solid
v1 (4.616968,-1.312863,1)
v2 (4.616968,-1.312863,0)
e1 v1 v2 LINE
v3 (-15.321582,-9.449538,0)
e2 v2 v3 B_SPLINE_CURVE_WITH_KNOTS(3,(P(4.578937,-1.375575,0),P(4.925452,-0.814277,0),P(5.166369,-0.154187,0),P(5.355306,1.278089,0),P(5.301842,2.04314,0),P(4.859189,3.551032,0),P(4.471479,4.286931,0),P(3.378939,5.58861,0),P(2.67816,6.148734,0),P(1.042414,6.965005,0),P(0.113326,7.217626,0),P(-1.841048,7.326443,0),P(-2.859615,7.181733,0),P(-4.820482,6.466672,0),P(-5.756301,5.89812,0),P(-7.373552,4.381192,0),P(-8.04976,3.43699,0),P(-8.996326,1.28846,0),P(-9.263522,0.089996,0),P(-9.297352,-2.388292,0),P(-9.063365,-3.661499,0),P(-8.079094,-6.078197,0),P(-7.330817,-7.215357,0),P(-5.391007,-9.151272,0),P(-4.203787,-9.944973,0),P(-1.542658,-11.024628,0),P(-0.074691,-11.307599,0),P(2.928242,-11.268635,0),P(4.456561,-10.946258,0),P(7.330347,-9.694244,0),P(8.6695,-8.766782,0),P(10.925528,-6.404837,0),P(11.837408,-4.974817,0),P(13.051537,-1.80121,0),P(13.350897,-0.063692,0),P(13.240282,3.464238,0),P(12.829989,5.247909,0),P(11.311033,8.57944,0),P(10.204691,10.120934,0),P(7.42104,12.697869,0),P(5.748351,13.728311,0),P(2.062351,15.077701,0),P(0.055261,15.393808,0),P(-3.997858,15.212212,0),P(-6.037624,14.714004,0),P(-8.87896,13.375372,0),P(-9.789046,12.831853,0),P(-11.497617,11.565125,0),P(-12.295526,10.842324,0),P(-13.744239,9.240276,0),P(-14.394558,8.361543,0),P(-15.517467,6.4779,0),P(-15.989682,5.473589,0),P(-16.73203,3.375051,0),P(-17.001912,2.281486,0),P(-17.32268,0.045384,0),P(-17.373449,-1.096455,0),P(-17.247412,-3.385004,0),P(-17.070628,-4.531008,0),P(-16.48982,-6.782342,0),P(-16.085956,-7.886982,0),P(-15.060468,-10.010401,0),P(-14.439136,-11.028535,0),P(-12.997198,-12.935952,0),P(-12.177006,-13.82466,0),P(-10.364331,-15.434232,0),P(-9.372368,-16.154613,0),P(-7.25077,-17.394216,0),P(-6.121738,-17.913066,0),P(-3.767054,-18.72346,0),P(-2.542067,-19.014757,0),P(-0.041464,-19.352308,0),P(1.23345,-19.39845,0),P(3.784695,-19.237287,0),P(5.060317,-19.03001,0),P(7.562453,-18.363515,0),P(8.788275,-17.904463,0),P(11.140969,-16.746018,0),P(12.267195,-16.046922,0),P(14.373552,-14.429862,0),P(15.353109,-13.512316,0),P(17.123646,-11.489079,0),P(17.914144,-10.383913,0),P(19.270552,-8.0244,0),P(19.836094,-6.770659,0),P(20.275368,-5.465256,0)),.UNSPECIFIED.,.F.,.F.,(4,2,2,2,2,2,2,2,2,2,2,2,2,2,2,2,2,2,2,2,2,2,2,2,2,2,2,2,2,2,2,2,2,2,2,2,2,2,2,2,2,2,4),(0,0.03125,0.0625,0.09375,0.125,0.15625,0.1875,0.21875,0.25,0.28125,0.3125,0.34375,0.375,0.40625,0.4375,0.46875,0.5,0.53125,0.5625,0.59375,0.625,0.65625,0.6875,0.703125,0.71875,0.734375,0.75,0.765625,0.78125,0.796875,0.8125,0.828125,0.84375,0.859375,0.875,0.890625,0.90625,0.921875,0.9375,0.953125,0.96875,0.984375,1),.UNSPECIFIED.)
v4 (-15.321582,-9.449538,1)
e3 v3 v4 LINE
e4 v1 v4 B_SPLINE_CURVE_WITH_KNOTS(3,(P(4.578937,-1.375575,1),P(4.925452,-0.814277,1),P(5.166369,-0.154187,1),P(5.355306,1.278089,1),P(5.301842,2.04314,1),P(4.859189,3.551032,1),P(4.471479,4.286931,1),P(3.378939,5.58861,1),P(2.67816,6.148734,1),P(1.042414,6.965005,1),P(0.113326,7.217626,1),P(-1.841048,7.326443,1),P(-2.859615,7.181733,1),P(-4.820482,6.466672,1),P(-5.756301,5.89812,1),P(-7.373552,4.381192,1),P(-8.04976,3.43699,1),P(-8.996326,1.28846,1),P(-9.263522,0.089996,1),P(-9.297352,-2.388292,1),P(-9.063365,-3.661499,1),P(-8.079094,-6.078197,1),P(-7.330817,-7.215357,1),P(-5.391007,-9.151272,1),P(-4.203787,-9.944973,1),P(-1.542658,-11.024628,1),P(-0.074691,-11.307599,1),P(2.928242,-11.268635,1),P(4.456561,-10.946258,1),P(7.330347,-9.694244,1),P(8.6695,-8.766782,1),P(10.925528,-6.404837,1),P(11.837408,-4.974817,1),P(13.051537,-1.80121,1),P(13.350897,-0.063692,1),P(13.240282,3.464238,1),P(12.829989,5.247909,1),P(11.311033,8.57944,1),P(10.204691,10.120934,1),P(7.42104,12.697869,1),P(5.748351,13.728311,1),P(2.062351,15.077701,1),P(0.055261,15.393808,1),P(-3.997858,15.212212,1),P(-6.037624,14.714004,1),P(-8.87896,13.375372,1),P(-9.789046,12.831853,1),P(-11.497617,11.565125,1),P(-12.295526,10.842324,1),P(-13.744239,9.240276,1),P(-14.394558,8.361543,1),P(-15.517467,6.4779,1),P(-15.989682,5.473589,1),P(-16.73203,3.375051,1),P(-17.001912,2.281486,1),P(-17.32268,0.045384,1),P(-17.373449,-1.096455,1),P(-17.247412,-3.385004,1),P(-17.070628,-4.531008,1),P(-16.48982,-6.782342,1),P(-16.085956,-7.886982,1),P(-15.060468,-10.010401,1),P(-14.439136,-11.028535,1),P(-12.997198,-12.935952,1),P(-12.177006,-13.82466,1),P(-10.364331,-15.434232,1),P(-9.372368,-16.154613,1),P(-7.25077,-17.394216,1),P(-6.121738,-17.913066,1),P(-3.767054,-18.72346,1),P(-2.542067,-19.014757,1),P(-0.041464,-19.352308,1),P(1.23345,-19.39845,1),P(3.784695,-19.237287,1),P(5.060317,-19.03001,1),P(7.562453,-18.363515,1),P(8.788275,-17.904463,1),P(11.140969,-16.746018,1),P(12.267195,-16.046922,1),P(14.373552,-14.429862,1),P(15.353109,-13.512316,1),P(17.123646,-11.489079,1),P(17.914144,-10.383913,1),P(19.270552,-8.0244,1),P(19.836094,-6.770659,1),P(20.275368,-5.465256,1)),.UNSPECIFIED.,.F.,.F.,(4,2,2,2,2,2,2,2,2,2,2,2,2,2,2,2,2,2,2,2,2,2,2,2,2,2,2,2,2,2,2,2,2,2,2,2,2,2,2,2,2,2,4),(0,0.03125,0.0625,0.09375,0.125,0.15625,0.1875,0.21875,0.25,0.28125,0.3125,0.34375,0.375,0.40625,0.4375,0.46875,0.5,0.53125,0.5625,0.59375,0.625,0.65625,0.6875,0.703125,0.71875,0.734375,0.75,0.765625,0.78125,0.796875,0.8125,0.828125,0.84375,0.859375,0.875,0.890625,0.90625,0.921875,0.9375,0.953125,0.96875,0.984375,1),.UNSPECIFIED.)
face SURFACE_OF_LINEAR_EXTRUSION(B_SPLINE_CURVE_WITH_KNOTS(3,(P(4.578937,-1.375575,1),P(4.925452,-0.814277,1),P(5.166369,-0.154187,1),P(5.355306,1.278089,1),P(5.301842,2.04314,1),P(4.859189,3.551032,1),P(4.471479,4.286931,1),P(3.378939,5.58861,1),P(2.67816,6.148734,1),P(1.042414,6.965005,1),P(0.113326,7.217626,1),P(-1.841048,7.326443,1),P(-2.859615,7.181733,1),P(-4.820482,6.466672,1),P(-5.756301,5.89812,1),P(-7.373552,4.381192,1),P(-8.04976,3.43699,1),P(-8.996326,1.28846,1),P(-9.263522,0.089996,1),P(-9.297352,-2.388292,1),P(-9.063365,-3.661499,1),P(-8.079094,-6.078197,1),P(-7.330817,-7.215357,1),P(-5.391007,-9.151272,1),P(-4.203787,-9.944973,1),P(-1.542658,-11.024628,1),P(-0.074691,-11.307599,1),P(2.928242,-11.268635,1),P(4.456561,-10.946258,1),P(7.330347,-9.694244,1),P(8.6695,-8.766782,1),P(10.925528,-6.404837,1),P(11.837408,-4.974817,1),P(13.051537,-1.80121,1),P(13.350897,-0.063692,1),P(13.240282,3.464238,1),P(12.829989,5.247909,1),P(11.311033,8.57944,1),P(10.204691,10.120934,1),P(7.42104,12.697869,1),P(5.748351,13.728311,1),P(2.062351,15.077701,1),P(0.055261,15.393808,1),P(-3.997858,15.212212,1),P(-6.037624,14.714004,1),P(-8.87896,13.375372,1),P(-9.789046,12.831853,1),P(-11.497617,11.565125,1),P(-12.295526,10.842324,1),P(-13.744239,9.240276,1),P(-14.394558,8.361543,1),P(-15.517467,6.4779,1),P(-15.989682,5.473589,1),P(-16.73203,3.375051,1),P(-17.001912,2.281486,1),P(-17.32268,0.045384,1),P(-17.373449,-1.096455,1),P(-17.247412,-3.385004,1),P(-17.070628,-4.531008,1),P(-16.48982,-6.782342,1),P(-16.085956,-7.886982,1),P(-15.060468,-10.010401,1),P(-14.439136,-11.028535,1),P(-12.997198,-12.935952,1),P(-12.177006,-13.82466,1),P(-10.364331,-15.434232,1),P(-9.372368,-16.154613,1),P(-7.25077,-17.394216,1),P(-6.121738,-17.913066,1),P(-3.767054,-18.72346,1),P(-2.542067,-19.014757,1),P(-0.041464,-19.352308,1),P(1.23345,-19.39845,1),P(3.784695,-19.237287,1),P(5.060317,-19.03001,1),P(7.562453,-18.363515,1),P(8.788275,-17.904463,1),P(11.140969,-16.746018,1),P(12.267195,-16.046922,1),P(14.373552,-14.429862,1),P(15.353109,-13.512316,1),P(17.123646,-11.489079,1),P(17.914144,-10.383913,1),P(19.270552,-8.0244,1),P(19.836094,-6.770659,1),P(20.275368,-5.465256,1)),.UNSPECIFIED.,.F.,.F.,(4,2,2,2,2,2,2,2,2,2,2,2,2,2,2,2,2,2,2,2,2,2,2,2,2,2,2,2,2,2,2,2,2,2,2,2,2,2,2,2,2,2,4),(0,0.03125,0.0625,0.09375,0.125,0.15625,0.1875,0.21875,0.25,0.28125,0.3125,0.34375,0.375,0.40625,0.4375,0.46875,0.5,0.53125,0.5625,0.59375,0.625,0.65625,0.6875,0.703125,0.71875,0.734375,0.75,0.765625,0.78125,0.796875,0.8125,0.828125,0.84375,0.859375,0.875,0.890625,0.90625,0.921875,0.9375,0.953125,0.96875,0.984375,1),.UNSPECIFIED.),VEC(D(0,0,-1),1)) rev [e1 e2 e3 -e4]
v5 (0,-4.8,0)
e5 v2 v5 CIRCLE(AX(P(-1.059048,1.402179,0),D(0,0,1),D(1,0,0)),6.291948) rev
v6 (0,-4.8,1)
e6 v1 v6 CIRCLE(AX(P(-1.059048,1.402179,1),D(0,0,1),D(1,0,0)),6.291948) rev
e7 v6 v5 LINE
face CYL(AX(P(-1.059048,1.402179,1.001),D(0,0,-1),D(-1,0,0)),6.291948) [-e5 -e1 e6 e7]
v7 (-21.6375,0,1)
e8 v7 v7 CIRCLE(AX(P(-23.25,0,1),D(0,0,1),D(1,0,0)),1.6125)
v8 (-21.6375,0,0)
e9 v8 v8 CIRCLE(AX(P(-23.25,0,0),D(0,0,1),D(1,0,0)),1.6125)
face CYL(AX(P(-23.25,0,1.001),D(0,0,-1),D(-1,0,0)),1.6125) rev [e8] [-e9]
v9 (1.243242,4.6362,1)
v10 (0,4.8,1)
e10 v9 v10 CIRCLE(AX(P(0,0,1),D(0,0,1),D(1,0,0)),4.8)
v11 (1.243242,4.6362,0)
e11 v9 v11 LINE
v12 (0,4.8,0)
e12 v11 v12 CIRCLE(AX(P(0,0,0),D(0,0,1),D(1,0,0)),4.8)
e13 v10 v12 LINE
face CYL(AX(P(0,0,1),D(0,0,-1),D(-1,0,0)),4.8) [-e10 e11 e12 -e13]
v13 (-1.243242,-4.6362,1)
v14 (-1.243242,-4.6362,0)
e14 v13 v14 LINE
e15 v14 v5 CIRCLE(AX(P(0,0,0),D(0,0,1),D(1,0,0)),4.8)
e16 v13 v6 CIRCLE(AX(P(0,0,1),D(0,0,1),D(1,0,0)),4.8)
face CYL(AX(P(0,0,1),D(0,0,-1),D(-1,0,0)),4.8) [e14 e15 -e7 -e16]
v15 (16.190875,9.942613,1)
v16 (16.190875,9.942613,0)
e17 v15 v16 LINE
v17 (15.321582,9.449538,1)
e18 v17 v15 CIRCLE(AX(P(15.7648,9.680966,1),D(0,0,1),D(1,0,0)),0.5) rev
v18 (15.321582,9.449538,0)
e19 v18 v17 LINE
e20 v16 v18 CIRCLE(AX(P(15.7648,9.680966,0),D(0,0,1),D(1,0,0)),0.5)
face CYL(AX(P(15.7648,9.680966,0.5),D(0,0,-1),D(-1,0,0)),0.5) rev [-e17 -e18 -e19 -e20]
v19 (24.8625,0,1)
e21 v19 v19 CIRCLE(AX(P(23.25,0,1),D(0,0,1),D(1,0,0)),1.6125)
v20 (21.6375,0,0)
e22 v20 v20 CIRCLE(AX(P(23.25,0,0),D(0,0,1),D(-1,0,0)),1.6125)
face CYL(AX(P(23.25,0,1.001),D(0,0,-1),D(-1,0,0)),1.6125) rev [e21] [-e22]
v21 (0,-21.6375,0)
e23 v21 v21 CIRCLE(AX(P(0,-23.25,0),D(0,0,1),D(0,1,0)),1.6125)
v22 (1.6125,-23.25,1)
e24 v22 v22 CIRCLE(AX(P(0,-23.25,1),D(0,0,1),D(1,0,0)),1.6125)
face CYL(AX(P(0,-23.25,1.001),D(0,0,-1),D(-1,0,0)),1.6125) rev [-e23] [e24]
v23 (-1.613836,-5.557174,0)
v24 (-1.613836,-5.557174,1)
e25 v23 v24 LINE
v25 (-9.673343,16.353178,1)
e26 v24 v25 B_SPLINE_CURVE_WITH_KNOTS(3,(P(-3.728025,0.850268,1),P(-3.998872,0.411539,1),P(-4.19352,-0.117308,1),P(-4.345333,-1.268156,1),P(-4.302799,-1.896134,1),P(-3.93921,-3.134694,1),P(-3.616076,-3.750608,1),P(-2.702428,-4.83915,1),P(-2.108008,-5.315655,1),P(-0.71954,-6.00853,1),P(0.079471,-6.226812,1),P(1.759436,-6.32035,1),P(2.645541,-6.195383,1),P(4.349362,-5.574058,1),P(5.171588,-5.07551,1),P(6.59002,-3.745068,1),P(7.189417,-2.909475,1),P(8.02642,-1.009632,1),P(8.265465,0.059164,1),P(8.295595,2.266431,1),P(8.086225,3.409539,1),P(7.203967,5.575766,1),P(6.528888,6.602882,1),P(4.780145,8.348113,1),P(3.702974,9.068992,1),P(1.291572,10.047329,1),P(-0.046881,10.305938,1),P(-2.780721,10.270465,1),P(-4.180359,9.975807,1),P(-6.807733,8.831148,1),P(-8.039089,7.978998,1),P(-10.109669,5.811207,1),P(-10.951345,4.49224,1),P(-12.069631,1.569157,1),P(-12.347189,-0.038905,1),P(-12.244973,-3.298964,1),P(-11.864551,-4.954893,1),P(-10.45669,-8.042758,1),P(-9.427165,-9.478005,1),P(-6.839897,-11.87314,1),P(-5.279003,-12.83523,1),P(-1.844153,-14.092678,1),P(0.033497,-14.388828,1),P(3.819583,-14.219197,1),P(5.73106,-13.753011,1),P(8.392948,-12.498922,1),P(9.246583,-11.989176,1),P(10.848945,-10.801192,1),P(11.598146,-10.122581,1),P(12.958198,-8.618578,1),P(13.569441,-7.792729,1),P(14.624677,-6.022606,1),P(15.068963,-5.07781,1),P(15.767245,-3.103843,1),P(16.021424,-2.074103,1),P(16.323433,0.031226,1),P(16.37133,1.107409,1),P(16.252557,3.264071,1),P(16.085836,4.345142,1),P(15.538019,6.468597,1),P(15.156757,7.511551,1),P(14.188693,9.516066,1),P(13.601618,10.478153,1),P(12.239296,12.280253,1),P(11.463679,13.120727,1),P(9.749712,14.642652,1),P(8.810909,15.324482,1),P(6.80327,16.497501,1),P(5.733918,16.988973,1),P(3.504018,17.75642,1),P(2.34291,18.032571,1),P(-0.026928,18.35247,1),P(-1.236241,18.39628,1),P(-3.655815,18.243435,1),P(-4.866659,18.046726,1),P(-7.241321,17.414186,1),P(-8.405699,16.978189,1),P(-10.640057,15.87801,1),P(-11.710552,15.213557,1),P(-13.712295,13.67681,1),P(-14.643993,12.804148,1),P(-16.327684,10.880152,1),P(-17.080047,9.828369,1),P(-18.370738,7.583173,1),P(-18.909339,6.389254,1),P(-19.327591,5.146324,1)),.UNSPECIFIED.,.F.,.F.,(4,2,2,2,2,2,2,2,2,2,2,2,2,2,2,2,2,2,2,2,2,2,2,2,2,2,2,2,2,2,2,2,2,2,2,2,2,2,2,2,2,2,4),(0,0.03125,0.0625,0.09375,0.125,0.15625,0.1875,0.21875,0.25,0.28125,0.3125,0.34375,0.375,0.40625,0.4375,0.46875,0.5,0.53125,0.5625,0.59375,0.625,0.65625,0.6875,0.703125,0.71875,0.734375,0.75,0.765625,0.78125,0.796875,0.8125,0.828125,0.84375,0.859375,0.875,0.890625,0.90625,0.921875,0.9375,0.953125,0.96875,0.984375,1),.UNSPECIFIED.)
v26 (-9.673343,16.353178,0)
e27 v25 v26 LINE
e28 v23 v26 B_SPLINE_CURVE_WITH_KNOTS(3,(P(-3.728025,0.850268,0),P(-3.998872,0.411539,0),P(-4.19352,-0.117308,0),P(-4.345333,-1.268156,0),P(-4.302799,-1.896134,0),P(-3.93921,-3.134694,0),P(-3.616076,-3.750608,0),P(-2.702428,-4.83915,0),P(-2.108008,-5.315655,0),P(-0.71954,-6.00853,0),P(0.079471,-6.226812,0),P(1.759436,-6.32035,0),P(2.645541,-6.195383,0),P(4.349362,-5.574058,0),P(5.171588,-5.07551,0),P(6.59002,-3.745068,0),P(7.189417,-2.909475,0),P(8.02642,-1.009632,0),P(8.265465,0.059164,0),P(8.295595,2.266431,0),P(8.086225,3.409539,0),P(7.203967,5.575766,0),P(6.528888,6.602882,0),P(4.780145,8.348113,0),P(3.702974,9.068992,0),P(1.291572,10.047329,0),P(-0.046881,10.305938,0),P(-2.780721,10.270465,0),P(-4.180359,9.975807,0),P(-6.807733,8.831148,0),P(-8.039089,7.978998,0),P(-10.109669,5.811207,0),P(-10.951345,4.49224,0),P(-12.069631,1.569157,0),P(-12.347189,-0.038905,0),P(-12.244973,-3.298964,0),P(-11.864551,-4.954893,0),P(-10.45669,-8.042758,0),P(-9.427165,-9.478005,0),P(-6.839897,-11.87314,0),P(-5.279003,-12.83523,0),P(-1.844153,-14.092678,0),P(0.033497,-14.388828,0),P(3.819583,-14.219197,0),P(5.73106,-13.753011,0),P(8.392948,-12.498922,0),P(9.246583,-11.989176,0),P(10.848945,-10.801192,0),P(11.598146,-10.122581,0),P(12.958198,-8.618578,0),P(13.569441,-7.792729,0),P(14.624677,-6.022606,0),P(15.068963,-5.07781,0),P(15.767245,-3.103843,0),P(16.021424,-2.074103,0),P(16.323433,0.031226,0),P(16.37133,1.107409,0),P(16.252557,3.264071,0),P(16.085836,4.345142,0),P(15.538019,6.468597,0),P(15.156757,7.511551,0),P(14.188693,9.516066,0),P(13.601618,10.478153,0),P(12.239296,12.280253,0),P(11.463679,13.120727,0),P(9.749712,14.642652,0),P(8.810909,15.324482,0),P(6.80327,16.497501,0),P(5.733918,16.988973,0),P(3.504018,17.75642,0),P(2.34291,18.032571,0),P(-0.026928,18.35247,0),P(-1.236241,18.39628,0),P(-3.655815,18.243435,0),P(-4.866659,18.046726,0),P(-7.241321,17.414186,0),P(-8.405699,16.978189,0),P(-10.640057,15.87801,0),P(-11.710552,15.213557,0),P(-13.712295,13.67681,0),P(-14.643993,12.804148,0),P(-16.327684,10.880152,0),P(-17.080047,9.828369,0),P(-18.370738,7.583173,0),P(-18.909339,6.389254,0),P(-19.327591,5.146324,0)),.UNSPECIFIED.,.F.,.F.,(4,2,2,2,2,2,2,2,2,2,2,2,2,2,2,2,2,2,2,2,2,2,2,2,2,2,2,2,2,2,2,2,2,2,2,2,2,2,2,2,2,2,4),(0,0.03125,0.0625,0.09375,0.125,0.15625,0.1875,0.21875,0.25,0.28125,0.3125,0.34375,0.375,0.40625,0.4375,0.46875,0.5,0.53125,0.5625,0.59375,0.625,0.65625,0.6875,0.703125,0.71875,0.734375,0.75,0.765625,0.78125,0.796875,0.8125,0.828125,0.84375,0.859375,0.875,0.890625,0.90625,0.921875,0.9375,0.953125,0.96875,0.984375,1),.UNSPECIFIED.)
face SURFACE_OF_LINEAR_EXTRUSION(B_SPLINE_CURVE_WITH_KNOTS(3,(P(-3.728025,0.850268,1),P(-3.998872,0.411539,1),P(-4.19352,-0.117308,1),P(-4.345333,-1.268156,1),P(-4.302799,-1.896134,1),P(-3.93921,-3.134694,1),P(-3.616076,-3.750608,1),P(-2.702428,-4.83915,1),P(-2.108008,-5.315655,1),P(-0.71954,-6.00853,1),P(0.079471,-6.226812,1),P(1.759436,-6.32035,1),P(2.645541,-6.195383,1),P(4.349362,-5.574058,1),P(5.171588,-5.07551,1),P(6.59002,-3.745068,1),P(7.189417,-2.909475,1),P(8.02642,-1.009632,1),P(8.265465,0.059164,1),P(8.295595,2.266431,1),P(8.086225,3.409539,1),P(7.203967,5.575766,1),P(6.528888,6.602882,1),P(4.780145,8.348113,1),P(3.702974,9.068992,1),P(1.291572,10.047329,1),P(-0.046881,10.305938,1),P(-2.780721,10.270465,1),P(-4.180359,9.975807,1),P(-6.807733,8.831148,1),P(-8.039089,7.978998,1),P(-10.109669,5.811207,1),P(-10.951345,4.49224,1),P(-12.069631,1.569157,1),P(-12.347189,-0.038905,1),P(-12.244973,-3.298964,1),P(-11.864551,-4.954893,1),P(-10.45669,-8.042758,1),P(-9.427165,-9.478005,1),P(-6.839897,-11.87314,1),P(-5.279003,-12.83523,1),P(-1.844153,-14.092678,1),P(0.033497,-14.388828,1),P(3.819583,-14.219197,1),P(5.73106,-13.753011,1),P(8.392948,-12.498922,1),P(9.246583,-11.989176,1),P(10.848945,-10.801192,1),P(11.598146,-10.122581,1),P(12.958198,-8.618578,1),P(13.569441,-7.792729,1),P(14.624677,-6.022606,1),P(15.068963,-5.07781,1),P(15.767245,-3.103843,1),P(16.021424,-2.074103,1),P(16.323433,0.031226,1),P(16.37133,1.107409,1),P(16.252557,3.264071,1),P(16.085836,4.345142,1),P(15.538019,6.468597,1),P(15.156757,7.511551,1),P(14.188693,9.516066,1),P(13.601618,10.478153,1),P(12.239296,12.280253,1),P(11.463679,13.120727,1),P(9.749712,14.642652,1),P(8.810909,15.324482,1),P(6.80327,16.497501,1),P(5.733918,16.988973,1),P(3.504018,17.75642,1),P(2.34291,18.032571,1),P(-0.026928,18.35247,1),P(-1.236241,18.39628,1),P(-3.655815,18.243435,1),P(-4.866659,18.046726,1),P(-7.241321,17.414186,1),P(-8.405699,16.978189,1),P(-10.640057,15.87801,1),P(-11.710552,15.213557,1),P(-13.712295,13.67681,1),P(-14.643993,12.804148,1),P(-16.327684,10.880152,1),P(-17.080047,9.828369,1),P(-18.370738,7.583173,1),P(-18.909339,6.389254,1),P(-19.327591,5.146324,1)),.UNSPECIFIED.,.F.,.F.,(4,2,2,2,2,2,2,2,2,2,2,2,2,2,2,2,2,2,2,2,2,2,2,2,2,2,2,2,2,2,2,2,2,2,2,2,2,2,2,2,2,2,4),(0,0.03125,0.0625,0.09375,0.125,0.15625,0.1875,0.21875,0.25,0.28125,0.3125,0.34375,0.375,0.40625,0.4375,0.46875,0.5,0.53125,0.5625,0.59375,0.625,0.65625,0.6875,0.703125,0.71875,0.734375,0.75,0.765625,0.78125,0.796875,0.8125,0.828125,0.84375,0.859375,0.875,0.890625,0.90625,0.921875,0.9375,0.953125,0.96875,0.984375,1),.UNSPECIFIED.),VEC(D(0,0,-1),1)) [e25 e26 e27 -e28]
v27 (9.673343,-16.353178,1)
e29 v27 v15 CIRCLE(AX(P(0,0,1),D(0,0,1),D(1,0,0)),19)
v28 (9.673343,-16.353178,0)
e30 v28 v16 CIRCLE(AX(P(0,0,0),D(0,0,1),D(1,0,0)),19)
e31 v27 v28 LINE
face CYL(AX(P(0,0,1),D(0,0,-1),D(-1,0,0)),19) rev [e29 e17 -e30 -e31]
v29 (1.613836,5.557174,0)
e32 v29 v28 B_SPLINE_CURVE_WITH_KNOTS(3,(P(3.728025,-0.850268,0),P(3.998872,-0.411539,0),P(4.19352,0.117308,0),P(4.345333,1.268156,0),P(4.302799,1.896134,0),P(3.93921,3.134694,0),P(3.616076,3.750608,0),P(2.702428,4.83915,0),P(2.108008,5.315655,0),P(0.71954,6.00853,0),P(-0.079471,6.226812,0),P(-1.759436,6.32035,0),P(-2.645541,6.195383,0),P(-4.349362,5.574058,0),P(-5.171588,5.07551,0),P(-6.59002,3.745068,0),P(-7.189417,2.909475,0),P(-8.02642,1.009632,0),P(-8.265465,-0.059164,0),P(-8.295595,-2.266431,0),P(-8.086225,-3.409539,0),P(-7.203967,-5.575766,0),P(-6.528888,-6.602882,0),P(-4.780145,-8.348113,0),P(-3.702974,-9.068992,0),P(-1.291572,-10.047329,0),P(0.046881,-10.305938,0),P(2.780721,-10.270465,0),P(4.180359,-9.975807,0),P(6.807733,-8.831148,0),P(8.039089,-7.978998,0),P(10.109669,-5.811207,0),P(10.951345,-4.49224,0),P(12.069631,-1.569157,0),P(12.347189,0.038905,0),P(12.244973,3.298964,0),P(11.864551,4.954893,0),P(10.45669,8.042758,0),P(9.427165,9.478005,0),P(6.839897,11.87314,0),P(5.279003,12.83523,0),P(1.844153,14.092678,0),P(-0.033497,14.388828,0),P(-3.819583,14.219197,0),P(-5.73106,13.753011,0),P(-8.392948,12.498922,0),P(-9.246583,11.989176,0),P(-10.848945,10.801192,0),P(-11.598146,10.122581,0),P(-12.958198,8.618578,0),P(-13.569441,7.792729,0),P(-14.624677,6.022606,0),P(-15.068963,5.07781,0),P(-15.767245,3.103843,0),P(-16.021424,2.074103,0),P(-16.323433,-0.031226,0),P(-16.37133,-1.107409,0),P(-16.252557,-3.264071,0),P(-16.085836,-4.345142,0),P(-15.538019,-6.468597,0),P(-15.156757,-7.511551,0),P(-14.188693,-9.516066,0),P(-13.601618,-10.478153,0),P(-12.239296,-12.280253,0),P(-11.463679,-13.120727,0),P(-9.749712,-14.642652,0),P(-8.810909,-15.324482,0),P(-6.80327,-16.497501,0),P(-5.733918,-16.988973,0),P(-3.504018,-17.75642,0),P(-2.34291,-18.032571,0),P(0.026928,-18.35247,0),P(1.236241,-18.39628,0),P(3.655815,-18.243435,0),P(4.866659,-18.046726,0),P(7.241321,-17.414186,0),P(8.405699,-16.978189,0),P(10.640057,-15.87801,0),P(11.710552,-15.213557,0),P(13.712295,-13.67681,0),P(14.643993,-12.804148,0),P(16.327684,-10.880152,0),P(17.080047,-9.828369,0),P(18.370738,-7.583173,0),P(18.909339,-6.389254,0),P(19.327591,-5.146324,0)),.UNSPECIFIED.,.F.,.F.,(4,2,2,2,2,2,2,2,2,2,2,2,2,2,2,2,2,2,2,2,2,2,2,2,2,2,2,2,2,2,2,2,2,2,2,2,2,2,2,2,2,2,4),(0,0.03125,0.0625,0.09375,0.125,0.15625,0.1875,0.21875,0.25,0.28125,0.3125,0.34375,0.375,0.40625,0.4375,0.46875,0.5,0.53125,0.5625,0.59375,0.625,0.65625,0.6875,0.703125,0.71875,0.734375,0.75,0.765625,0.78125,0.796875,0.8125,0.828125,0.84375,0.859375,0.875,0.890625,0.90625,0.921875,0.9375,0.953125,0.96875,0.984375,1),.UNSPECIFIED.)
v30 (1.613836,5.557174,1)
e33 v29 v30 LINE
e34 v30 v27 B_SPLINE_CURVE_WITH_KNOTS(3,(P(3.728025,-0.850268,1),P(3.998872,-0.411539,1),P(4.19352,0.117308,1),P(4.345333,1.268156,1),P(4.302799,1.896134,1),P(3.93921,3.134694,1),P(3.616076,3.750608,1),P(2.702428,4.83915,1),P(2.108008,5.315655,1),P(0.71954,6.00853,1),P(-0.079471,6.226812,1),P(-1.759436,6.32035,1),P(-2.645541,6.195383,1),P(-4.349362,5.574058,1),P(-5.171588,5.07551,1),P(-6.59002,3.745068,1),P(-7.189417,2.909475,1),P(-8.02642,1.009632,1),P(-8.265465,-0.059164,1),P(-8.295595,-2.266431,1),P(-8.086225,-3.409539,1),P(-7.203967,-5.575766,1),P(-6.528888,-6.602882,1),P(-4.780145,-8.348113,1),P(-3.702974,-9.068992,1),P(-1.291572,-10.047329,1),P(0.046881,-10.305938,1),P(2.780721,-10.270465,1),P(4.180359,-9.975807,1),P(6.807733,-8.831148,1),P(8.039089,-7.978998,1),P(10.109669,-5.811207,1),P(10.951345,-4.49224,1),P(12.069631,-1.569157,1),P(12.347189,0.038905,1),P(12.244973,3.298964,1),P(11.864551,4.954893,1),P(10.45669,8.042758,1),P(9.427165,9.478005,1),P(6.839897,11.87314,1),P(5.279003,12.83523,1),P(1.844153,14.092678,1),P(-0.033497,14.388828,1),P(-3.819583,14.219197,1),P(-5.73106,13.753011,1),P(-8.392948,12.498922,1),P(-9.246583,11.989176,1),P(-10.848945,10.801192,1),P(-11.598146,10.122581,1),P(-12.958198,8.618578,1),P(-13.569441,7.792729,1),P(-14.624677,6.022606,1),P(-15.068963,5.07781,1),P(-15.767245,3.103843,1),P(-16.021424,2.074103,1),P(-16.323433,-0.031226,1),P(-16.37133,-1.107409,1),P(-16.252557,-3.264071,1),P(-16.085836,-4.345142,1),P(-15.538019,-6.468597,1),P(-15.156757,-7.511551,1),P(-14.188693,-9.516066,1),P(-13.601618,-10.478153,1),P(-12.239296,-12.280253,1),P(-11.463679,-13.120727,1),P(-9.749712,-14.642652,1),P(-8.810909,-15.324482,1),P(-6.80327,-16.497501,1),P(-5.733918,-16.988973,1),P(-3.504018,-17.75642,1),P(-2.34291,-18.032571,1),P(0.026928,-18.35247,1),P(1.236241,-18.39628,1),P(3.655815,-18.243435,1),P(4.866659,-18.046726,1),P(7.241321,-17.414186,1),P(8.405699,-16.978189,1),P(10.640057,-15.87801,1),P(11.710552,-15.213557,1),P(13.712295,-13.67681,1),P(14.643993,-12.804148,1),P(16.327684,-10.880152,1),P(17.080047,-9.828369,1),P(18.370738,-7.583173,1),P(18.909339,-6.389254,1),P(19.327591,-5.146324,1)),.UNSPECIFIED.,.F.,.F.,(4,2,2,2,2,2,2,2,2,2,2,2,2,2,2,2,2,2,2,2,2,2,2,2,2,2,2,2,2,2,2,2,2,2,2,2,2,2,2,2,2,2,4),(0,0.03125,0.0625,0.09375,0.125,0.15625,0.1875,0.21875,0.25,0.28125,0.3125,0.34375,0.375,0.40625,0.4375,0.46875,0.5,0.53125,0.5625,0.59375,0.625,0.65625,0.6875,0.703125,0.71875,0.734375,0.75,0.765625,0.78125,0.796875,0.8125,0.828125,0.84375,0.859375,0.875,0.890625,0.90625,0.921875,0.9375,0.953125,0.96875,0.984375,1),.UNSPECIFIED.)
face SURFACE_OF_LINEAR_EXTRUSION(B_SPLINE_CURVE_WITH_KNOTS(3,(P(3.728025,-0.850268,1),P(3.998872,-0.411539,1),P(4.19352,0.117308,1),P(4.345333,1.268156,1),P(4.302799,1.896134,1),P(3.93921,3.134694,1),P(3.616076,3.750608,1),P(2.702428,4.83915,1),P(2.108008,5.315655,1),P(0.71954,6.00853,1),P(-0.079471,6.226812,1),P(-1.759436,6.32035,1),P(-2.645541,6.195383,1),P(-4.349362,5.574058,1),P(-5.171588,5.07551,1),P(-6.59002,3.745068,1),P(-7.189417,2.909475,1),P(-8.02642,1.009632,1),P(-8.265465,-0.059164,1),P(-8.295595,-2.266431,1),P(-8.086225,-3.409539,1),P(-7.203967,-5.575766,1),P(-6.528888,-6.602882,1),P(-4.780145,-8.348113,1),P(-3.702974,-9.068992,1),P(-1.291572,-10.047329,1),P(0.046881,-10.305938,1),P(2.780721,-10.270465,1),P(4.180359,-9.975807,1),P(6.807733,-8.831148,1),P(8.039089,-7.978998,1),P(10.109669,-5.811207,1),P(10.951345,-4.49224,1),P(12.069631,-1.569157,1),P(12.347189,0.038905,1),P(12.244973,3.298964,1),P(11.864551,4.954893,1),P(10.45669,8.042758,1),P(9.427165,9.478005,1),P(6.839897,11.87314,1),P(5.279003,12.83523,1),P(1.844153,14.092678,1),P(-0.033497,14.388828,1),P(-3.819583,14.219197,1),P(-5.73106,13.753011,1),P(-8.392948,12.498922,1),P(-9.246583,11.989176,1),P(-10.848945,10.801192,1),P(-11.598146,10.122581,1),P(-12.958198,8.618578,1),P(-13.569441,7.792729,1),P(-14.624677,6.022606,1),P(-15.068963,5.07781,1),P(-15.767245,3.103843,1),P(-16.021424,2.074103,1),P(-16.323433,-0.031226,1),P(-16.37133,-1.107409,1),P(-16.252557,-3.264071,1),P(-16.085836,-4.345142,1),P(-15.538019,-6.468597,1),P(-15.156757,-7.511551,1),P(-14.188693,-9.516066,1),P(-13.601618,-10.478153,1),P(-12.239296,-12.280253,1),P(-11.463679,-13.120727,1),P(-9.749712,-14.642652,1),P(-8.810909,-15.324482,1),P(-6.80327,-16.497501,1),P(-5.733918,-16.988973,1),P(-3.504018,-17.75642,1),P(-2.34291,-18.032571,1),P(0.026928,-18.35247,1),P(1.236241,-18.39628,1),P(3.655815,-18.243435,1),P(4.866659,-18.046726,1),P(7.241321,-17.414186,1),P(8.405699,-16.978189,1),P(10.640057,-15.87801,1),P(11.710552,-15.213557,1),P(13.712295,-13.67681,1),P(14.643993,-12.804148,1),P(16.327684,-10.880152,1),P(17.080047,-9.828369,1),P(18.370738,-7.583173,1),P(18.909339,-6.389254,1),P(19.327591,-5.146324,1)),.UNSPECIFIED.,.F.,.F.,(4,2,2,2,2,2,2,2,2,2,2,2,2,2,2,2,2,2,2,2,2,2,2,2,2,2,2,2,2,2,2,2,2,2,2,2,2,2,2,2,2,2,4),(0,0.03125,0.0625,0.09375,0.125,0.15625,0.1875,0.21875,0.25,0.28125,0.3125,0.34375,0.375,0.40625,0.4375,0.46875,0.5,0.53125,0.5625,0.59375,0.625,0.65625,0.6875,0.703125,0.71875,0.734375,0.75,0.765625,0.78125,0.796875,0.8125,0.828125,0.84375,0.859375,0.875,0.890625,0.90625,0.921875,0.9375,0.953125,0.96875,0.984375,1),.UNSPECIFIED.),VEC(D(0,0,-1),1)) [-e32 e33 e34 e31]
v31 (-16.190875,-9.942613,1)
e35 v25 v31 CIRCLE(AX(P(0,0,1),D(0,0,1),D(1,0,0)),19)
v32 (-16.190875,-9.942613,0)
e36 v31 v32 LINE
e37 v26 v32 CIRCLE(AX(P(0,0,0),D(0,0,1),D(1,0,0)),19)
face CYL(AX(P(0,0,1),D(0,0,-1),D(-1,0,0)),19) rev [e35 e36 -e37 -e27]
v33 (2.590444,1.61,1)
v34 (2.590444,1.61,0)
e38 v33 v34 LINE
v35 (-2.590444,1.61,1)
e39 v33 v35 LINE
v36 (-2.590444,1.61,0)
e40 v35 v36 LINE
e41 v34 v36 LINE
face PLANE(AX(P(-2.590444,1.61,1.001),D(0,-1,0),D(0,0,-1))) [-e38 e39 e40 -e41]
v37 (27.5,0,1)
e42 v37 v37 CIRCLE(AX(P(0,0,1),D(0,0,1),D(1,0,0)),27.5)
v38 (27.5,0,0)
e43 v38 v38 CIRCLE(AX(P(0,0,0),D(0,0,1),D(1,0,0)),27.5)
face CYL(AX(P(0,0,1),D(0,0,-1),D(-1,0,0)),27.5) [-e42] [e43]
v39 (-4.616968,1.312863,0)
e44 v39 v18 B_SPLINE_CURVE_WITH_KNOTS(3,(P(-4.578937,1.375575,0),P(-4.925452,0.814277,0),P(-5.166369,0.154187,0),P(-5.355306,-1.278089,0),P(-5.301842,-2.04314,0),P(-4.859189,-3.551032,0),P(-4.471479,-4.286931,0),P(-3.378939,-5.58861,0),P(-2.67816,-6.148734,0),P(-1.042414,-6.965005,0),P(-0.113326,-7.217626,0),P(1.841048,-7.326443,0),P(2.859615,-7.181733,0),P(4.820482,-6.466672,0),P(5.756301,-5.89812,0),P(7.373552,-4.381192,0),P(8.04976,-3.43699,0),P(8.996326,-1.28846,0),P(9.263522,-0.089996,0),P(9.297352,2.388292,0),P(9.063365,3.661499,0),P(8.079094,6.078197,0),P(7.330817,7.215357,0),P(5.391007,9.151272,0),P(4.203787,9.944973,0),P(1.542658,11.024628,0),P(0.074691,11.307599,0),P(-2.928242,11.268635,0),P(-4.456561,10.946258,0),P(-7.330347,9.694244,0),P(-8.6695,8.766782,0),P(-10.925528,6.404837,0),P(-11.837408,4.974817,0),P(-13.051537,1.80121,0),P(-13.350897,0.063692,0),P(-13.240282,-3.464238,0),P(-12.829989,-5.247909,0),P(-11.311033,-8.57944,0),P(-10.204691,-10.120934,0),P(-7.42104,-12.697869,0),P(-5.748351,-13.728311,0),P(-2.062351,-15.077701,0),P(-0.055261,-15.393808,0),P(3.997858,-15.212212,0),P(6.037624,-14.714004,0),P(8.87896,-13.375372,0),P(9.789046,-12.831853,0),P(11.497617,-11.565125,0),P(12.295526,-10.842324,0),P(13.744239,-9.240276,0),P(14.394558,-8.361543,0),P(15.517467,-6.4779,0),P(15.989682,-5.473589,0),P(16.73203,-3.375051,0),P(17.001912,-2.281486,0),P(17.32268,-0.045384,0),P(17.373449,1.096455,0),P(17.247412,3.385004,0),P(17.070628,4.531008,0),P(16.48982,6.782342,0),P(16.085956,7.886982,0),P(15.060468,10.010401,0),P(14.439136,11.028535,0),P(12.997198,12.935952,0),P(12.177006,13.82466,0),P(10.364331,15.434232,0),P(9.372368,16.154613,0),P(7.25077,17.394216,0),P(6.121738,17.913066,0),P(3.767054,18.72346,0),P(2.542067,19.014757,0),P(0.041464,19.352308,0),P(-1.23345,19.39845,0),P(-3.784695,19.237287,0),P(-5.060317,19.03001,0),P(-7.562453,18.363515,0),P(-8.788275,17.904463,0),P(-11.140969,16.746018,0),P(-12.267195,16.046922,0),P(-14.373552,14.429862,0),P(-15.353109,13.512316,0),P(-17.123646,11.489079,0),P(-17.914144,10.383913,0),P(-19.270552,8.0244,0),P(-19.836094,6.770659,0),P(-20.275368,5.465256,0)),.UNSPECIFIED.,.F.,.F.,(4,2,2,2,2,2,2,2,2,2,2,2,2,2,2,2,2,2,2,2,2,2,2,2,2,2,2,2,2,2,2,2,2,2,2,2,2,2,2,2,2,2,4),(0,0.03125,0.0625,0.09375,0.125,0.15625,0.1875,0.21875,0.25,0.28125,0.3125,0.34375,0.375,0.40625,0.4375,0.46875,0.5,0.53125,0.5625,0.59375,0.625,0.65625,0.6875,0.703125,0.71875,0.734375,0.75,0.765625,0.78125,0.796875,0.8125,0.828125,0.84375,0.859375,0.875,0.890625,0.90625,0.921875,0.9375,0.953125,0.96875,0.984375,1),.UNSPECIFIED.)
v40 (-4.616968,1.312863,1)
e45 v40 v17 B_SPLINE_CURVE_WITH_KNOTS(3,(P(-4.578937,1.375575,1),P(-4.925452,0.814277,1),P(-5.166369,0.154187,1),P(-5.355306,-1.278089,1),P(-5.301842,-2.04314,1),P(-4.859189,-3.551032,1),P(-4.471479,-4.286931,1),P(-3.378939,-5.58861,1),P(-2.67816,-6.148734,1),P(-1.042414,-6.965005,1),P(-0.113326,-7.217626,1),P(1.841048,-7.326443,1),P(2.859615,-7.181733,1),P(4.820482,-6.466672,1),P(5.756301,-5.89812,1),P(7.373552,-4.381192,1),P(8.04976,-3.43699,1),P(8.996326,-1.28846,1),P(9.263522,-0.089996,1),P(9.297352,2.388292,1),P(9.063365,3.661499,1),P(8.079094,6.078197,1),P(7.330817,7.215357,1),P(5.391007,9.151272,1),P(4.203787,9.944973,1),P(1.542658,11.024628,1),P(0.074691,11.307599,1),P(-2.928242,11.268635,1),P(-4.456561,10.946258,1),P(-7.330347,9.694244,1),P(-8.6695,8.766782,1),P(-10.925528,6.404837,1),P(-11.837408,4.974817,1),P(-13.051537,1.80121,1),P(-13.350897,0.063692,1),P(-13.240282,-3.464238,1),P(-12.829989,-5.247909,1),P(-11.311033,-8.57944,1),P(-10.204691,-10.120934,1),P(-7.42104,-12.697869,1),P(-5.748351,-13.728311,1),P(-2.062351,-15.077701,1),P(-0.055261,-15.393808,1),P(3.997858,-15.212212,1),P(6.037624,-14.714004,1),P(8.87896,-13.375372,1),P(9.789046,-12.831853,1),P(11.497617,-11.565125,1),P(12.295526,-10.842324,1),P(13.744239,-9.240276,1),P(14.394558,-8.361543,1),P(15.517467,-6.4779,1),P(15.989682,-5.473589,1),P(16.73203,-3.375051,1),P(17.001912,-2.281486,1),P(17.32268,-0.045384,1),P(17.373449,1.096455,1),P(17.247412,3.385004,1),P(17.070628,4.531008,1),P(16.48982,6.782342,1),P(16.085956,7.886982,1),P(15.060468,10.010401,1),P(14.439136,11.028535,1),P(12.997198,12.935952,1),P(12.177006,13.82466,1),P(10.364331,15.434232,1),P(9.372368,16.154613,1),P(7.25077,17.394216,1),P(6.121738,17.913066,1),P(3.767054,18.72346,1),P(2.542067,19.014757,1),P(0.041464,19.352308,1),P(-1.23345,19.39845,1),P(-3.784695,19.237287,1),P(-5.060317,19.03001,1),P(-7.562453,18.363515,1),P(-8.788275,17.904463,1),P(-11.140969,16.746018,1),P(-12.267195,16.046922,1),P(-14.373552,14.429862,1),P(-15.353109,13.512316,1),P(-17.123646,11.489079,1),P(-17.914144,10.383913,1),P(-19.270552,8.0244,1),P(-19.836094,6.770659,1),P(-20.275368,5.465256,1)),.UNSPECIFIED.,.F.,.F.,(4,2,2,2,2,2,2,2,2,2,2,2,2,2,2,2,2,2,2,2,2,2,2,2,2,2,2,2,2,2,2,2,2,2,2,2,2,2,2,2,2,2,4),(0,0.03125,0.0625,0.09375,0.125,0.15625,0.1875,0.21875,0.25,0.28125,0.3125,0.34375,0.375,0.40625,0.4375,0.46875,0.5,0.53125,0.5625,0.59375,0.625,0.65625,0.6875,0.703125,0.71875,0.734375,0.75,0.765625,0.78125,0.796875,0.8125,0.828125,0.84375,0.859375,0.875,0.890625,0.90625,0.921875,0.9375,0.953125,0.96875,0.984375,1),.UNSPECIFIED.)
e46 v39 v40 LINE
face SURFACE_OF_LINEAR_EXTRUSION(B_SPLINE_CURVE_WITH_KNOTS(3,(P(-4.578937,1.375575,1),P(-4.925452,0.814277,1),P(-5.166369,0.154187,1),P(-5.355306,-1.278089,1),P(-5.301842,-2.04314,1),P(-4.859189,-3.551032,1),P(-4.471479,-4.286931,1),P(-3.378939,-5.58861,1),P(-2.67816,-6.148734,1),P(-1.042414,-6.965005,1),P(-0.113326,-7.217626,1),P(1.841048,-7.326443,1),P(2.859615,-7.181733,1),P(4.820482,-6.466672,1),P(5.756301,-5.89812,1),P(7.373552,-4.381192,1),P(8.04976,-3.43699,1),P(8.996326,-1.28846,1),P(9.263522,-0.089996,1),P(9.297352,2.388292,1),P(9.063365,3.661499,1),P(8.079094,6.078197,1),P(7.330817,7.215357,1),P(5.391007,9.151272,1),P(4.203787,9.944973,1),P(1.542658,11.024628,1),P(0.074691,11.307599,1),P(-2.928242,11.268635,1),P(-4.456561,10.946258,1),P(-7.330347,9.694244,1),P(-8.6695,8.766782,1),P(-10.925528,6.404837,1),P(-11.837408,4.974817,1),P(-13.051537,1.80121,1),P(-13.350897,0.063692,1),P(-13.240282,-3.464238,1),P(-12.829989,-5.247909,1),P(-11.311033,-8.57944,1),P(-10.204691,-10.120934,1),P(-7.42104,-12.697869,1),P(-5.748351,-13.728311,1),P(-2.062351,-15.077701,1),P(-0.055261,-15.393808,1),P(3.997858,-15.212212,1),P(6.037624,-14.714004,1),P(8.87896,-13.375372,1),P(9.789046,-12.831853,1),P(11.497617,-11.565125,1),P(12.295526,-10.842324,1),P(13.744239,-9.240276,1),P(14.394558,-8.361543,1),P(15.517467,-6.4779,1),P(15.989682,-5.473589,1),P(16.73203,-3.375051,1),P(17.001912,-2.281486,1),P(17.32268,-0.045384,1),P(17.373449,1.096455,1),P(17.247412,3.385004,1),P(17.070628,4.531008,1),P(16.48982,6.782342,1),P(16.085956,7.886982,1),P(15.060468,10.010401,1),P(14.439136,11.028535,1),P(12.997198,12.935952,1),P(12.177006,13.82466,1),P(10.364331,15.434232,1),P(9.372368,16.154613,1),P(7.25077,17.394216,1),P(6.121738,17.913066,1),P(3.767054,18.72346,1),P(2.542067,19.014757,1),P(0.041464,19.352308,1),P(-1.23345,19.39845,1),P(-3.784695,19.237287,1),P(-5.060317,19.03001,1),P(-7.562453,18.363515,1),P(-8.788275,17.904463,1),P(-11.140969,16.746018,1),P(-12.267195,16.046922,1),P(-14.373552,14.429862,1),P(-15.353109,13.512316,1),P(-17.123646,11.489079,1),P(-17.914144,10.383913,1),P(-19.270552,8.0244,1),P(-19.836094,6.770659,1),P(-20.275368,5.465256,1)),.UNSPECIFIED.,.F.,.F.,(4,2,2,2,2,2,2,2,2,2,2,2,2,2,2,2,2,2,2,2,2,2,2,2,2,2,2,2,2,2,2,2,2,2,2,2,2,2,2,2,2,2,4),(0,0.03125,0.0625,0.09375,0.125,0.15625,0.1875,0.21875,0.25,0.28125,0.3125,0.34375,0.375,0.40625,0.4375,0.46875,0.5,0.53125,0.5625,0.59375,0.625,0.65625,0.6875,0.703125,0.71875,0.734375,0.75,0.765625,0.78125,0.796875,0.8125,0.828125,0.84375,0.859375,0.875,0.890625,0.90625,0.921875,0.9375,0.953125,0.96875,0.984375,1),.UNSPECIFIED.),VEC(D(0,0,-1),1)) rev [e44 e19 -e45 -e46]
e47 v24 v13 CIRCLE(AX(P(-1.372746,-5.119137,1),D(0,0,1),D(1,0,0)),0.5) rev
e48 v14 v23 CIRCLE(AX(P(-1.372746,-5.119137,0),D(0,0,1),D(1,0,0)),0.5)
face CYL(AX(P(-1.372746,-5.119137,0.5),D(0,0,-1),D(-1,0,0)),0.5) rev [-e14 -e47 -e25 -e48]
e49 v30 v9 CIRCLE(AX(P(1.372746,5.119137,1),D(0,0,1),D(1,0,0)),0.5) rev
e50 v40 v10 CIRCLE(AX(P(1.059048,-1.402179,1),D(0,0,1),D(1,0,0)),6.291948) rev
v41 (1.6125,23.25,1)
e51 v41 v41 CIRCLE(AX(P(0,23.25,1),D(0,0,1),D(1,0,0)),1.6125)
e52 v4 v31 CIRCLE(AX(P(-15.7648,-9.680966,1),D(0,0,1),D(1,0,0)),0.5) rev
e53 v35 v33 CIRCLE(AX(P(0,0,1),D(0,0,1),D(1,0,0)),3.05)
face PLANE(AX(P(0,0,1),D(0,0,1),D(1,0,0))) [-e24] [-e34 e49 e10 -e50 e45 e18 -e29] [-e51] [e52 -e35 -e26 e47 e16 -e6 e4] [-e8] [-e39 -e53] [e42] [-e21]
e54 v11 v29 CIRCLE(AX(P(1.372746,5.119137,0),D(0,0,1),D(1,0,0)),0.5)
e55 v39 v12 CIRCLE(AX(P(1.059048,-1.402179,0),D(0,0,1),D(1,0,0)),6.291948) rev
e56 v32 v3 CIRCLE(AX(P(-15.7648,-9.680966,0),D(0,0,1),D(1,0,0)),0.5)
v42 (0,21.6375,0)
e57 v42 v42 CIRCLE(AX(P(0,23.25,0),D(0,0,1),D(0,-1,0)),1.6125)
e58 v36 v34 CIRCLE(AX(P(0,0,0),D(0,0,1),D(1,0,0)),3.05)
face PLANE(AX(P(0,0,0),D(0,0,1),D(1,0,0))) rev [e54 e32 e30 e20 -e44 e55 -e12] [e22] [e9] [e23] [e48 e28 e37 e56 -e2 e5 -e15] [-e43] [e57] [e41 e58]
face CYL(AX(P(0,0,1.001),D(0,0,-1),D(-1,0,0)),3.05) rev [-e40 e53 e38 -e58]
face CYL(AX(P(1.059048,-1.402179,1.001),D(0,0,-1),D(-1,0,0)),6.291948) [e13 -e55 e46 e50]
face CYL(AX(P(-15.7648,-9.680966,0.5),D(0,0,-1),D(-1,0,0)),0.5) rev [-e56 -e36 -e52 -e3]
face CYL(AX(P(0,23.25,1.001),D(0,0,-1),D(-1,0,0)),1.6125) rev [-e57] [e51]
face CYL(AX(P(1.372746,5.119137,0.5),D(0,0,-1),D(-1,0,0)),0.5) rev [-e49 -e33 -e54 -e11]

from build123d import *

# Parameters (mm, degrees)
SKETCH1_R             = 27.5
SKETCH1_R_2           = 19
BOSS_EXTRUDE1_DEPTH   = 1
SKETCH1_R_3           = 4.8
BOSS_EXTRUDE1_2_DEPTH = 1
EXTRUDE_THIN1_DEPTH   = 1
CIRPATTERN1_COUNT     = 2
CUT_EXTRUDE2_REACH    = 40.904
SKETCH4_R             = 1.6125
CIRPATTERN2_COUNT     = 4
CUT_EXTRUDE3_REACH    = 40.904
CUT_EXTRUDE4_REACH    = 40.904
FILLET1_R             = 0.5


# Read off the part's stored shape, not the designer's step: Extrude-Thin1
with BuildPart() as part:
    # Sketch1 → Boss-Extrude1 (new body)
    with BuildSketch(Plane.XY):
        Circle(SKETCH1_R)
        Circle(SKETCH1_R_2, mode=Mode.SUBTRACT)
    extrude(amount=BOSS_EXTRUDE1_DEPTH)



with BuildPart() as body_2:
    # Sketch1 → Boss-Extrude1 2 (new body)
    with BuildSketch(Plane.XY):
        Circle(SKETCH1_R_3)
    extrude(amount=BOSS_EXTRUDE1_2_DEPTH)


with BuildPart() as part_1:
    add(part.part)

    add(body_2.part)  # Extrude-Thin1 merges body 2
    # Extrude-Thin1 outline → Extrude-Thin1 (add)
    with BuildSketch(Plane.XY):
        with BuildLine():
            ThreePointArc((-4.1501233, -2.411737256), (-4.762733752, -0.596964995), (-4.616967757, 1.3128628))
            add(Edge.make_bspline(
                [(-4.616967757, 1.3128628), (-4.943081028, 0.765349858), (-5.169864523, 0.127687507), (-5.355306094, -1.278088652), (-5.301842016, -2.043139795), (-4.859188725, -3.551031956), (-4.471479317, -4.286931017), (-3.378938771, -5.588610336), (-2.678159506, -6.148733615), (-1.042414288, -6.965005297), (-0.113326225, -7.217626119), (1.841047876, -7.326442843), (2.859615289, -7.181732933), (4.820481685, -6.466672339), (5.756300869, -5.898120183), (7.373552044, -4.381191967), (8.049759866, -3.436989565), (8.996325909, -1.288459909), (9.263522232, -0.08999614), (9.297351722, 2.388292247), (9.063365167, 3.661498518), (8.079094366, 6.078196523), (7.330817218, 7.21535725), (5.391007136, 9.151271502), (4.203787489, 9.944972922), (1.542657603, 11.024627961), (0.074691301, 11.307599162), (-2.92824168, 11.268635466), (-4.456560603, 10.946257826), (-7.33034721, 9.694244108), (-8.669499753, 8.766782392), (-10.925527578, 6.404837082), (-11.837407727, 4.974817402), (-13.051536764, 1.80120975), (-13.350897147, 0.06369187), (-13.24028216, -3.464237885), (-12.829989003, -5.247909034), (-11.311032582, -8.57944028), (-10.204690735, -10.120933956), (-7.421039782, -12.697868649), (-5.748351277, -13.728311493), (-2.062351415, -15.077701288), (-0.05526103, -15.393807631), (3.997858373, -15.212212358), (6.037623922, -14.714003834), (8.878960382, -13.375371813), (9.78904575, -12.831853057), (11.49761735, -11.565125362), (12.295525838, -10.842324033), (13.744239237, -9.240276265), (14.394557589, -8.361543058), (15.517467071, -6.477900151), (15.989681778, -5.473589371), (16.732030028, -3.375051498), (17.001911961, -2.281485753), (17.322679917, -0.045383588), (17.373448977, 1.09645474), (17.24741181, 3.385004369), (17.070627882, 4.531007949), (16.489819683, 6.782341623), (16.085956187, 7.886981861), (15.060468044, 10.010401061), (14.439136488, 11.028534842), (12.997198381, 12.935951912), (12.177005947, 13.824659784), (10.364331279, 15.434232102), (9.372368201, 16.154613288), (7.25076965, 17.394216417), (6.121738304, 17.913066091), (4.822602666, 18.360179685), (4.700299373, 18.400877508), (4.577510929, 18.440346897)],
                knots=[0.00115634, 0.00115634, 0.00115634, 0.00115634, 0.03125, 0.03125, 0.0625, 0.0625, 0.09375, 0.09375, 0.125, 0.125, 0.15625, 0.15625, 0.1875, 0.1875, 0.21875, 0.21875, 0.25, 0.25, 0.28125, 0.28125, 0.3125, 0.3125, 0.34375, 0.34375, 0.375, 0.375, 0.40625, 0.40625, 0.4375, 0.4375, 0.46875, 0.46875, 0.5, 0.5, 0.53125, 0.53125, 0.5625, 0.5625, 0.59375, 0.59375, 0.625, 0.625, 0.65625, 0.65625, 0.6875, 0.6875, 0.703125, 0.703125, 0.71875, 0.71875, 0.734375, 0.734375, 0.75, 0.75, 0.765625, 0.765625, 0.78125, 0.78125, 0.796875, 0.796875, 0.8125, 0.8125, 0.828125, 0.828125, 0.84375, 0.84375, 0.859375, 0.859375, 0.875, 0.875, 0.876616371, 0.876616371, 0.876616371, 0.876616371], degree=3))
            ThreePointArc((4.577510929, 18.440346897), (-2.753351692, 18.79944293), (-9.673343334, 16.35317794))
            add(Edge.make_bspline(
                [(-4.1501233, -2.411737256), (-4.140847737, -2.446316182), (-4.131142689, -2.480878679), (-3.939210141, -3.134694184), (-3.616075824, -3.750607935), (-2.702428349, -4.839149707), (-2.108008333, -5.315654549), (-0.719539714, -6.008529944), (0.079470824, -6.226811929), (1.759435727, -6.320349946), (2.645540607, -6.195382798), (4.349362419, -5.574057531), (5.171588038, -5.075510068), (6.5900201, -3.745067617), (7.189416593, -2.909474957), (8.026420231, -1.009631675), (8.265465151, 0.059163511), (8.295595109, 2.266430742), (8.08622533, 3.409539414), (7.20396651, 5.575765545), (6.528888144, 6.602881612), (4.780144912, 8.348112743), (3.702973715, 9.068991831), (1.291571564, 10.047329077), (-0.046881443, 10.305937555), (-2.780720694, 10.270465408), (-4.180359364, 9.975807436), (-6.807732822, 8.831147773), (-8.039089064, 7.97899808), (-10.109668769, 5.811207431), (-10.951345321, 4.492240484), (-12.069631173, 1.569157), (-12.347188905, -0.038904784), (-12.244972756, -3.298963874), (-11.864551024, -4.954892969), (-10.456690303, -8.042757716), (-9.427164848, -9.478004816), (-6.839897195, -11.873139799), (-5.279003292, -12.835229849), (-1.844152919, -14.092677547), (0.033496715, -14.388827756), (3.819582772, -14.2191966), (5.731060118, -13.753010958), (8.392947599, -12.498922303), (9.246583219, -11.989175992), (10.8489454, -10.801191507), (11.598145844, -10.122581348), (12.958198357, -8.61857849), (13.569441073, -7.792729059), (14.62467701, -6.022606249), (15.068962883, -5.077809547), (15.76724468, -3.103842752), (16.021424378, -2.074103382), (16.323433053, 0.031226151), (16.371330315, 1.107409235), (16.25255662, 3.264070643), (16.085836354, 4.345142417), (15.53801887, 6.468597204), (15.156757206, 7.511551176), (14.188693018, 9.516065902), (13.601617815, 10.478153088), (12.239295673, 12.280252981), (11.463678882, 13.120727391), (9.749711602, 14.642652057), (8.810908855, 15.324481682), (6.803270202, 16.497500562), (5.733917521, 16.988972516), (3.504017736, 17.756420101), (2.342909638, 18.032571234), (-0.026928113, 18.352470253), (-1.236241063, 18.39628011), (-3.655814801, 18.243434736), (-4.866658511, 18.046726032), (-7.241320503, 17.414186225), (-8.405698768, 16.97818876), (-9.573128135, 16.403356756), (-9.623284003, 16.378382562), (-9.673343334, 16.35317794)],
                knots=[0.060757279, 0.060757279, 0.060757279, 0.060757279, 0.0625, 0.0625, 0.09375, 0.09375, 0.125, 0.125, 0.15625, 0.15625, 0.1875, 0.1875, 0.21875, 0.21875, 0.25, 0.25, 0.28125, 0.28125, 0.3125, 0.3125, 0.34375, 0.34375, 0.375, 0.375, 0.40625, 0.40625, 0.4375, 0.4375, 0.46875, 0.46875, 0.5, 0.5, 0.53125, 0.53125, 0.5625, 0.5625, 0.59375, 0.59375, 0.625, 0.625, 0.65625, 0.65625, 0.6875, 0.6875, 0.703125, 0.703125, 0.71875, 0.71875, 0.734375, 0.734375, 0.75, 0.75, 0.765625, 0.765625, 0.78125, 0.78125, 0.796875, 0.796875, 0.8125, 0.8125, 0.828125, 0.828125, 0.84375, 0.84375, 0.859375, 0.859375, 0.875, 0.875, 0.890625, 0.890625, 0.90625, 0.90625, 0.921875, 0.921875, 0.9375, 0.9375, 0.938202807, 0.938202807, 0.938202807, 0.938202807], degree=3))
        make_face()
    extrude_thin1 = extrude(amount=EXTRUDE_THIN1_DEPTH)

    # CirPattern1: Extrude-Thin1 ×2 about axis
    cirpattern1_axis = Axis((0, 0, 1), (0, 0, -1))
    for i in range(1, CIRPATTERN1_COUNT):
        add(extrude_thin1.rotate(cirpattern1_axis, i * 360 / CIRPATTERN1_COUNT))

    # Sketch4 → Cut-Extrude2 (cut, up to next)
    with BuildSketch(Plane.XY, mode=Mode.PRIVATE) as cut_extrude2_sk1:
        with Locations((-23.25, 0)):
            Circle(SKETCH4_R)
    cut_extrude2_tool1 = extrude(cut_extrude2_sk1.sketch, amount=CUT_EXTRUDE2_REACH, mode=Mode.PRIVATE) & part_1.part
    cut_extrude2 = cut_extrude2_tool1.solids().sort_by_distance((-23.25, 0, 0))[0]
    add(cut_extrude2, mode=Mode.SUBTRACT)

    # CirPattern2: Cut-Extrude2 ×4 about axis
    cirpattern2_axis = Axis((0, 0, 0), (0, 0, 1))
    for i in range(1, CIRPATTERN2_COUNT):
        add(cut_extrude2.rotate(cirpattern2_axis, i * 360 / CIRPATTERN2_COUNT), mode=Mode.SUBTRACT)

    # Sketch6 → Cut-Extrude3 (cut, up to next)
    with BuildSketch(Plane.XY, mode=Mode.PRIVATE) as cut_extrude3_sk1:
        with BuildLine():
            Line((-2.590443977, 1.61), (2.590443977, 1.61))
            ThreePointArc((2.590443977, 1.61), (0, -3.05), (-2.590443977, 1.61))
        make_face()
    cut_extrude3_tool1 = extrude(cut_extrude3_sk1.sketch, amount=CUT_EXTRUDE3_REACH, mode=Mode.PRIVATE) & part_1.part
    add(cut_extrude3_tool1.solids().sort_by_distance((0, -0.483746, 0))[0], mode=Mode.SUBTRACT)

    # Sketch7 → Cut-Extrude4 (cut, up to next)
    with BuildSketch(Plane.XY, mode=Mode.PRIVATE) as cut_extrude4_sk1:
        with BuildLine():
            ThreePointArc((-4.616967757, 1.3128628), (-2.892944742, 3.830257265), (0, 4.8))
            ThreePointArc((0, 4.8), (-2.733088901, 3.618608219), (-4.616967757, 1.3128628))
        make_face()
    cut_extrude4_tool1 = extrude(cut_extrude4_sk1.sketch, amount=CUT_EXTRUDE4_REACH, mode=Mode.PRIVATE) & part_1.part
    # Sketch7 → Cut-Extrude4 (cut, up to next)
    with BuildSketch(Plane.XY, mode=Mode.PRIVATE) as cut_extrude4_sk2:
        with BuildLine():
            ThreePointArc((4.616967757, -1.3128628), (2.892944742, -3.830257265), (0, -4.8))
            ThreePointArc((0, -4.8), (2.733088901, -3.618608219), (4.616967757, -1.3128628))
        make_face()
    cut_extrude4_tool2 = extrude(cut_extrude4_sk2.sketch, amount=CUT_EXTRUDE4_REACH, mode=Mode.PRIVATE) & part_1.part
    add(cut_extrude4_tool1.solids().sort_by_distance((-2.858073, 3.784088, 0))[0], mode=Mode.SUBTRACT)
    add(cut_extrude4_tool2.solids().sort_by_distance((2.858073, -3.784088, 0))[0], mode=Mode.SUBTRACT)

    # Fillet1
    fillet1_edges = [part_1.edges().sort_by_distance(p)[0] for p in [
        (4.577510929, 18.440346897, 0.5),
        (-4.1501233, -2.411737256, 0.5),
        (4.1501233, 2.411737256, 0.5),
        (-4.577510929, -18.440346897, 0.5),
    ]]
    fillet(fillet1_edges, radius=FILLET1_R)


solid = part_1.part
